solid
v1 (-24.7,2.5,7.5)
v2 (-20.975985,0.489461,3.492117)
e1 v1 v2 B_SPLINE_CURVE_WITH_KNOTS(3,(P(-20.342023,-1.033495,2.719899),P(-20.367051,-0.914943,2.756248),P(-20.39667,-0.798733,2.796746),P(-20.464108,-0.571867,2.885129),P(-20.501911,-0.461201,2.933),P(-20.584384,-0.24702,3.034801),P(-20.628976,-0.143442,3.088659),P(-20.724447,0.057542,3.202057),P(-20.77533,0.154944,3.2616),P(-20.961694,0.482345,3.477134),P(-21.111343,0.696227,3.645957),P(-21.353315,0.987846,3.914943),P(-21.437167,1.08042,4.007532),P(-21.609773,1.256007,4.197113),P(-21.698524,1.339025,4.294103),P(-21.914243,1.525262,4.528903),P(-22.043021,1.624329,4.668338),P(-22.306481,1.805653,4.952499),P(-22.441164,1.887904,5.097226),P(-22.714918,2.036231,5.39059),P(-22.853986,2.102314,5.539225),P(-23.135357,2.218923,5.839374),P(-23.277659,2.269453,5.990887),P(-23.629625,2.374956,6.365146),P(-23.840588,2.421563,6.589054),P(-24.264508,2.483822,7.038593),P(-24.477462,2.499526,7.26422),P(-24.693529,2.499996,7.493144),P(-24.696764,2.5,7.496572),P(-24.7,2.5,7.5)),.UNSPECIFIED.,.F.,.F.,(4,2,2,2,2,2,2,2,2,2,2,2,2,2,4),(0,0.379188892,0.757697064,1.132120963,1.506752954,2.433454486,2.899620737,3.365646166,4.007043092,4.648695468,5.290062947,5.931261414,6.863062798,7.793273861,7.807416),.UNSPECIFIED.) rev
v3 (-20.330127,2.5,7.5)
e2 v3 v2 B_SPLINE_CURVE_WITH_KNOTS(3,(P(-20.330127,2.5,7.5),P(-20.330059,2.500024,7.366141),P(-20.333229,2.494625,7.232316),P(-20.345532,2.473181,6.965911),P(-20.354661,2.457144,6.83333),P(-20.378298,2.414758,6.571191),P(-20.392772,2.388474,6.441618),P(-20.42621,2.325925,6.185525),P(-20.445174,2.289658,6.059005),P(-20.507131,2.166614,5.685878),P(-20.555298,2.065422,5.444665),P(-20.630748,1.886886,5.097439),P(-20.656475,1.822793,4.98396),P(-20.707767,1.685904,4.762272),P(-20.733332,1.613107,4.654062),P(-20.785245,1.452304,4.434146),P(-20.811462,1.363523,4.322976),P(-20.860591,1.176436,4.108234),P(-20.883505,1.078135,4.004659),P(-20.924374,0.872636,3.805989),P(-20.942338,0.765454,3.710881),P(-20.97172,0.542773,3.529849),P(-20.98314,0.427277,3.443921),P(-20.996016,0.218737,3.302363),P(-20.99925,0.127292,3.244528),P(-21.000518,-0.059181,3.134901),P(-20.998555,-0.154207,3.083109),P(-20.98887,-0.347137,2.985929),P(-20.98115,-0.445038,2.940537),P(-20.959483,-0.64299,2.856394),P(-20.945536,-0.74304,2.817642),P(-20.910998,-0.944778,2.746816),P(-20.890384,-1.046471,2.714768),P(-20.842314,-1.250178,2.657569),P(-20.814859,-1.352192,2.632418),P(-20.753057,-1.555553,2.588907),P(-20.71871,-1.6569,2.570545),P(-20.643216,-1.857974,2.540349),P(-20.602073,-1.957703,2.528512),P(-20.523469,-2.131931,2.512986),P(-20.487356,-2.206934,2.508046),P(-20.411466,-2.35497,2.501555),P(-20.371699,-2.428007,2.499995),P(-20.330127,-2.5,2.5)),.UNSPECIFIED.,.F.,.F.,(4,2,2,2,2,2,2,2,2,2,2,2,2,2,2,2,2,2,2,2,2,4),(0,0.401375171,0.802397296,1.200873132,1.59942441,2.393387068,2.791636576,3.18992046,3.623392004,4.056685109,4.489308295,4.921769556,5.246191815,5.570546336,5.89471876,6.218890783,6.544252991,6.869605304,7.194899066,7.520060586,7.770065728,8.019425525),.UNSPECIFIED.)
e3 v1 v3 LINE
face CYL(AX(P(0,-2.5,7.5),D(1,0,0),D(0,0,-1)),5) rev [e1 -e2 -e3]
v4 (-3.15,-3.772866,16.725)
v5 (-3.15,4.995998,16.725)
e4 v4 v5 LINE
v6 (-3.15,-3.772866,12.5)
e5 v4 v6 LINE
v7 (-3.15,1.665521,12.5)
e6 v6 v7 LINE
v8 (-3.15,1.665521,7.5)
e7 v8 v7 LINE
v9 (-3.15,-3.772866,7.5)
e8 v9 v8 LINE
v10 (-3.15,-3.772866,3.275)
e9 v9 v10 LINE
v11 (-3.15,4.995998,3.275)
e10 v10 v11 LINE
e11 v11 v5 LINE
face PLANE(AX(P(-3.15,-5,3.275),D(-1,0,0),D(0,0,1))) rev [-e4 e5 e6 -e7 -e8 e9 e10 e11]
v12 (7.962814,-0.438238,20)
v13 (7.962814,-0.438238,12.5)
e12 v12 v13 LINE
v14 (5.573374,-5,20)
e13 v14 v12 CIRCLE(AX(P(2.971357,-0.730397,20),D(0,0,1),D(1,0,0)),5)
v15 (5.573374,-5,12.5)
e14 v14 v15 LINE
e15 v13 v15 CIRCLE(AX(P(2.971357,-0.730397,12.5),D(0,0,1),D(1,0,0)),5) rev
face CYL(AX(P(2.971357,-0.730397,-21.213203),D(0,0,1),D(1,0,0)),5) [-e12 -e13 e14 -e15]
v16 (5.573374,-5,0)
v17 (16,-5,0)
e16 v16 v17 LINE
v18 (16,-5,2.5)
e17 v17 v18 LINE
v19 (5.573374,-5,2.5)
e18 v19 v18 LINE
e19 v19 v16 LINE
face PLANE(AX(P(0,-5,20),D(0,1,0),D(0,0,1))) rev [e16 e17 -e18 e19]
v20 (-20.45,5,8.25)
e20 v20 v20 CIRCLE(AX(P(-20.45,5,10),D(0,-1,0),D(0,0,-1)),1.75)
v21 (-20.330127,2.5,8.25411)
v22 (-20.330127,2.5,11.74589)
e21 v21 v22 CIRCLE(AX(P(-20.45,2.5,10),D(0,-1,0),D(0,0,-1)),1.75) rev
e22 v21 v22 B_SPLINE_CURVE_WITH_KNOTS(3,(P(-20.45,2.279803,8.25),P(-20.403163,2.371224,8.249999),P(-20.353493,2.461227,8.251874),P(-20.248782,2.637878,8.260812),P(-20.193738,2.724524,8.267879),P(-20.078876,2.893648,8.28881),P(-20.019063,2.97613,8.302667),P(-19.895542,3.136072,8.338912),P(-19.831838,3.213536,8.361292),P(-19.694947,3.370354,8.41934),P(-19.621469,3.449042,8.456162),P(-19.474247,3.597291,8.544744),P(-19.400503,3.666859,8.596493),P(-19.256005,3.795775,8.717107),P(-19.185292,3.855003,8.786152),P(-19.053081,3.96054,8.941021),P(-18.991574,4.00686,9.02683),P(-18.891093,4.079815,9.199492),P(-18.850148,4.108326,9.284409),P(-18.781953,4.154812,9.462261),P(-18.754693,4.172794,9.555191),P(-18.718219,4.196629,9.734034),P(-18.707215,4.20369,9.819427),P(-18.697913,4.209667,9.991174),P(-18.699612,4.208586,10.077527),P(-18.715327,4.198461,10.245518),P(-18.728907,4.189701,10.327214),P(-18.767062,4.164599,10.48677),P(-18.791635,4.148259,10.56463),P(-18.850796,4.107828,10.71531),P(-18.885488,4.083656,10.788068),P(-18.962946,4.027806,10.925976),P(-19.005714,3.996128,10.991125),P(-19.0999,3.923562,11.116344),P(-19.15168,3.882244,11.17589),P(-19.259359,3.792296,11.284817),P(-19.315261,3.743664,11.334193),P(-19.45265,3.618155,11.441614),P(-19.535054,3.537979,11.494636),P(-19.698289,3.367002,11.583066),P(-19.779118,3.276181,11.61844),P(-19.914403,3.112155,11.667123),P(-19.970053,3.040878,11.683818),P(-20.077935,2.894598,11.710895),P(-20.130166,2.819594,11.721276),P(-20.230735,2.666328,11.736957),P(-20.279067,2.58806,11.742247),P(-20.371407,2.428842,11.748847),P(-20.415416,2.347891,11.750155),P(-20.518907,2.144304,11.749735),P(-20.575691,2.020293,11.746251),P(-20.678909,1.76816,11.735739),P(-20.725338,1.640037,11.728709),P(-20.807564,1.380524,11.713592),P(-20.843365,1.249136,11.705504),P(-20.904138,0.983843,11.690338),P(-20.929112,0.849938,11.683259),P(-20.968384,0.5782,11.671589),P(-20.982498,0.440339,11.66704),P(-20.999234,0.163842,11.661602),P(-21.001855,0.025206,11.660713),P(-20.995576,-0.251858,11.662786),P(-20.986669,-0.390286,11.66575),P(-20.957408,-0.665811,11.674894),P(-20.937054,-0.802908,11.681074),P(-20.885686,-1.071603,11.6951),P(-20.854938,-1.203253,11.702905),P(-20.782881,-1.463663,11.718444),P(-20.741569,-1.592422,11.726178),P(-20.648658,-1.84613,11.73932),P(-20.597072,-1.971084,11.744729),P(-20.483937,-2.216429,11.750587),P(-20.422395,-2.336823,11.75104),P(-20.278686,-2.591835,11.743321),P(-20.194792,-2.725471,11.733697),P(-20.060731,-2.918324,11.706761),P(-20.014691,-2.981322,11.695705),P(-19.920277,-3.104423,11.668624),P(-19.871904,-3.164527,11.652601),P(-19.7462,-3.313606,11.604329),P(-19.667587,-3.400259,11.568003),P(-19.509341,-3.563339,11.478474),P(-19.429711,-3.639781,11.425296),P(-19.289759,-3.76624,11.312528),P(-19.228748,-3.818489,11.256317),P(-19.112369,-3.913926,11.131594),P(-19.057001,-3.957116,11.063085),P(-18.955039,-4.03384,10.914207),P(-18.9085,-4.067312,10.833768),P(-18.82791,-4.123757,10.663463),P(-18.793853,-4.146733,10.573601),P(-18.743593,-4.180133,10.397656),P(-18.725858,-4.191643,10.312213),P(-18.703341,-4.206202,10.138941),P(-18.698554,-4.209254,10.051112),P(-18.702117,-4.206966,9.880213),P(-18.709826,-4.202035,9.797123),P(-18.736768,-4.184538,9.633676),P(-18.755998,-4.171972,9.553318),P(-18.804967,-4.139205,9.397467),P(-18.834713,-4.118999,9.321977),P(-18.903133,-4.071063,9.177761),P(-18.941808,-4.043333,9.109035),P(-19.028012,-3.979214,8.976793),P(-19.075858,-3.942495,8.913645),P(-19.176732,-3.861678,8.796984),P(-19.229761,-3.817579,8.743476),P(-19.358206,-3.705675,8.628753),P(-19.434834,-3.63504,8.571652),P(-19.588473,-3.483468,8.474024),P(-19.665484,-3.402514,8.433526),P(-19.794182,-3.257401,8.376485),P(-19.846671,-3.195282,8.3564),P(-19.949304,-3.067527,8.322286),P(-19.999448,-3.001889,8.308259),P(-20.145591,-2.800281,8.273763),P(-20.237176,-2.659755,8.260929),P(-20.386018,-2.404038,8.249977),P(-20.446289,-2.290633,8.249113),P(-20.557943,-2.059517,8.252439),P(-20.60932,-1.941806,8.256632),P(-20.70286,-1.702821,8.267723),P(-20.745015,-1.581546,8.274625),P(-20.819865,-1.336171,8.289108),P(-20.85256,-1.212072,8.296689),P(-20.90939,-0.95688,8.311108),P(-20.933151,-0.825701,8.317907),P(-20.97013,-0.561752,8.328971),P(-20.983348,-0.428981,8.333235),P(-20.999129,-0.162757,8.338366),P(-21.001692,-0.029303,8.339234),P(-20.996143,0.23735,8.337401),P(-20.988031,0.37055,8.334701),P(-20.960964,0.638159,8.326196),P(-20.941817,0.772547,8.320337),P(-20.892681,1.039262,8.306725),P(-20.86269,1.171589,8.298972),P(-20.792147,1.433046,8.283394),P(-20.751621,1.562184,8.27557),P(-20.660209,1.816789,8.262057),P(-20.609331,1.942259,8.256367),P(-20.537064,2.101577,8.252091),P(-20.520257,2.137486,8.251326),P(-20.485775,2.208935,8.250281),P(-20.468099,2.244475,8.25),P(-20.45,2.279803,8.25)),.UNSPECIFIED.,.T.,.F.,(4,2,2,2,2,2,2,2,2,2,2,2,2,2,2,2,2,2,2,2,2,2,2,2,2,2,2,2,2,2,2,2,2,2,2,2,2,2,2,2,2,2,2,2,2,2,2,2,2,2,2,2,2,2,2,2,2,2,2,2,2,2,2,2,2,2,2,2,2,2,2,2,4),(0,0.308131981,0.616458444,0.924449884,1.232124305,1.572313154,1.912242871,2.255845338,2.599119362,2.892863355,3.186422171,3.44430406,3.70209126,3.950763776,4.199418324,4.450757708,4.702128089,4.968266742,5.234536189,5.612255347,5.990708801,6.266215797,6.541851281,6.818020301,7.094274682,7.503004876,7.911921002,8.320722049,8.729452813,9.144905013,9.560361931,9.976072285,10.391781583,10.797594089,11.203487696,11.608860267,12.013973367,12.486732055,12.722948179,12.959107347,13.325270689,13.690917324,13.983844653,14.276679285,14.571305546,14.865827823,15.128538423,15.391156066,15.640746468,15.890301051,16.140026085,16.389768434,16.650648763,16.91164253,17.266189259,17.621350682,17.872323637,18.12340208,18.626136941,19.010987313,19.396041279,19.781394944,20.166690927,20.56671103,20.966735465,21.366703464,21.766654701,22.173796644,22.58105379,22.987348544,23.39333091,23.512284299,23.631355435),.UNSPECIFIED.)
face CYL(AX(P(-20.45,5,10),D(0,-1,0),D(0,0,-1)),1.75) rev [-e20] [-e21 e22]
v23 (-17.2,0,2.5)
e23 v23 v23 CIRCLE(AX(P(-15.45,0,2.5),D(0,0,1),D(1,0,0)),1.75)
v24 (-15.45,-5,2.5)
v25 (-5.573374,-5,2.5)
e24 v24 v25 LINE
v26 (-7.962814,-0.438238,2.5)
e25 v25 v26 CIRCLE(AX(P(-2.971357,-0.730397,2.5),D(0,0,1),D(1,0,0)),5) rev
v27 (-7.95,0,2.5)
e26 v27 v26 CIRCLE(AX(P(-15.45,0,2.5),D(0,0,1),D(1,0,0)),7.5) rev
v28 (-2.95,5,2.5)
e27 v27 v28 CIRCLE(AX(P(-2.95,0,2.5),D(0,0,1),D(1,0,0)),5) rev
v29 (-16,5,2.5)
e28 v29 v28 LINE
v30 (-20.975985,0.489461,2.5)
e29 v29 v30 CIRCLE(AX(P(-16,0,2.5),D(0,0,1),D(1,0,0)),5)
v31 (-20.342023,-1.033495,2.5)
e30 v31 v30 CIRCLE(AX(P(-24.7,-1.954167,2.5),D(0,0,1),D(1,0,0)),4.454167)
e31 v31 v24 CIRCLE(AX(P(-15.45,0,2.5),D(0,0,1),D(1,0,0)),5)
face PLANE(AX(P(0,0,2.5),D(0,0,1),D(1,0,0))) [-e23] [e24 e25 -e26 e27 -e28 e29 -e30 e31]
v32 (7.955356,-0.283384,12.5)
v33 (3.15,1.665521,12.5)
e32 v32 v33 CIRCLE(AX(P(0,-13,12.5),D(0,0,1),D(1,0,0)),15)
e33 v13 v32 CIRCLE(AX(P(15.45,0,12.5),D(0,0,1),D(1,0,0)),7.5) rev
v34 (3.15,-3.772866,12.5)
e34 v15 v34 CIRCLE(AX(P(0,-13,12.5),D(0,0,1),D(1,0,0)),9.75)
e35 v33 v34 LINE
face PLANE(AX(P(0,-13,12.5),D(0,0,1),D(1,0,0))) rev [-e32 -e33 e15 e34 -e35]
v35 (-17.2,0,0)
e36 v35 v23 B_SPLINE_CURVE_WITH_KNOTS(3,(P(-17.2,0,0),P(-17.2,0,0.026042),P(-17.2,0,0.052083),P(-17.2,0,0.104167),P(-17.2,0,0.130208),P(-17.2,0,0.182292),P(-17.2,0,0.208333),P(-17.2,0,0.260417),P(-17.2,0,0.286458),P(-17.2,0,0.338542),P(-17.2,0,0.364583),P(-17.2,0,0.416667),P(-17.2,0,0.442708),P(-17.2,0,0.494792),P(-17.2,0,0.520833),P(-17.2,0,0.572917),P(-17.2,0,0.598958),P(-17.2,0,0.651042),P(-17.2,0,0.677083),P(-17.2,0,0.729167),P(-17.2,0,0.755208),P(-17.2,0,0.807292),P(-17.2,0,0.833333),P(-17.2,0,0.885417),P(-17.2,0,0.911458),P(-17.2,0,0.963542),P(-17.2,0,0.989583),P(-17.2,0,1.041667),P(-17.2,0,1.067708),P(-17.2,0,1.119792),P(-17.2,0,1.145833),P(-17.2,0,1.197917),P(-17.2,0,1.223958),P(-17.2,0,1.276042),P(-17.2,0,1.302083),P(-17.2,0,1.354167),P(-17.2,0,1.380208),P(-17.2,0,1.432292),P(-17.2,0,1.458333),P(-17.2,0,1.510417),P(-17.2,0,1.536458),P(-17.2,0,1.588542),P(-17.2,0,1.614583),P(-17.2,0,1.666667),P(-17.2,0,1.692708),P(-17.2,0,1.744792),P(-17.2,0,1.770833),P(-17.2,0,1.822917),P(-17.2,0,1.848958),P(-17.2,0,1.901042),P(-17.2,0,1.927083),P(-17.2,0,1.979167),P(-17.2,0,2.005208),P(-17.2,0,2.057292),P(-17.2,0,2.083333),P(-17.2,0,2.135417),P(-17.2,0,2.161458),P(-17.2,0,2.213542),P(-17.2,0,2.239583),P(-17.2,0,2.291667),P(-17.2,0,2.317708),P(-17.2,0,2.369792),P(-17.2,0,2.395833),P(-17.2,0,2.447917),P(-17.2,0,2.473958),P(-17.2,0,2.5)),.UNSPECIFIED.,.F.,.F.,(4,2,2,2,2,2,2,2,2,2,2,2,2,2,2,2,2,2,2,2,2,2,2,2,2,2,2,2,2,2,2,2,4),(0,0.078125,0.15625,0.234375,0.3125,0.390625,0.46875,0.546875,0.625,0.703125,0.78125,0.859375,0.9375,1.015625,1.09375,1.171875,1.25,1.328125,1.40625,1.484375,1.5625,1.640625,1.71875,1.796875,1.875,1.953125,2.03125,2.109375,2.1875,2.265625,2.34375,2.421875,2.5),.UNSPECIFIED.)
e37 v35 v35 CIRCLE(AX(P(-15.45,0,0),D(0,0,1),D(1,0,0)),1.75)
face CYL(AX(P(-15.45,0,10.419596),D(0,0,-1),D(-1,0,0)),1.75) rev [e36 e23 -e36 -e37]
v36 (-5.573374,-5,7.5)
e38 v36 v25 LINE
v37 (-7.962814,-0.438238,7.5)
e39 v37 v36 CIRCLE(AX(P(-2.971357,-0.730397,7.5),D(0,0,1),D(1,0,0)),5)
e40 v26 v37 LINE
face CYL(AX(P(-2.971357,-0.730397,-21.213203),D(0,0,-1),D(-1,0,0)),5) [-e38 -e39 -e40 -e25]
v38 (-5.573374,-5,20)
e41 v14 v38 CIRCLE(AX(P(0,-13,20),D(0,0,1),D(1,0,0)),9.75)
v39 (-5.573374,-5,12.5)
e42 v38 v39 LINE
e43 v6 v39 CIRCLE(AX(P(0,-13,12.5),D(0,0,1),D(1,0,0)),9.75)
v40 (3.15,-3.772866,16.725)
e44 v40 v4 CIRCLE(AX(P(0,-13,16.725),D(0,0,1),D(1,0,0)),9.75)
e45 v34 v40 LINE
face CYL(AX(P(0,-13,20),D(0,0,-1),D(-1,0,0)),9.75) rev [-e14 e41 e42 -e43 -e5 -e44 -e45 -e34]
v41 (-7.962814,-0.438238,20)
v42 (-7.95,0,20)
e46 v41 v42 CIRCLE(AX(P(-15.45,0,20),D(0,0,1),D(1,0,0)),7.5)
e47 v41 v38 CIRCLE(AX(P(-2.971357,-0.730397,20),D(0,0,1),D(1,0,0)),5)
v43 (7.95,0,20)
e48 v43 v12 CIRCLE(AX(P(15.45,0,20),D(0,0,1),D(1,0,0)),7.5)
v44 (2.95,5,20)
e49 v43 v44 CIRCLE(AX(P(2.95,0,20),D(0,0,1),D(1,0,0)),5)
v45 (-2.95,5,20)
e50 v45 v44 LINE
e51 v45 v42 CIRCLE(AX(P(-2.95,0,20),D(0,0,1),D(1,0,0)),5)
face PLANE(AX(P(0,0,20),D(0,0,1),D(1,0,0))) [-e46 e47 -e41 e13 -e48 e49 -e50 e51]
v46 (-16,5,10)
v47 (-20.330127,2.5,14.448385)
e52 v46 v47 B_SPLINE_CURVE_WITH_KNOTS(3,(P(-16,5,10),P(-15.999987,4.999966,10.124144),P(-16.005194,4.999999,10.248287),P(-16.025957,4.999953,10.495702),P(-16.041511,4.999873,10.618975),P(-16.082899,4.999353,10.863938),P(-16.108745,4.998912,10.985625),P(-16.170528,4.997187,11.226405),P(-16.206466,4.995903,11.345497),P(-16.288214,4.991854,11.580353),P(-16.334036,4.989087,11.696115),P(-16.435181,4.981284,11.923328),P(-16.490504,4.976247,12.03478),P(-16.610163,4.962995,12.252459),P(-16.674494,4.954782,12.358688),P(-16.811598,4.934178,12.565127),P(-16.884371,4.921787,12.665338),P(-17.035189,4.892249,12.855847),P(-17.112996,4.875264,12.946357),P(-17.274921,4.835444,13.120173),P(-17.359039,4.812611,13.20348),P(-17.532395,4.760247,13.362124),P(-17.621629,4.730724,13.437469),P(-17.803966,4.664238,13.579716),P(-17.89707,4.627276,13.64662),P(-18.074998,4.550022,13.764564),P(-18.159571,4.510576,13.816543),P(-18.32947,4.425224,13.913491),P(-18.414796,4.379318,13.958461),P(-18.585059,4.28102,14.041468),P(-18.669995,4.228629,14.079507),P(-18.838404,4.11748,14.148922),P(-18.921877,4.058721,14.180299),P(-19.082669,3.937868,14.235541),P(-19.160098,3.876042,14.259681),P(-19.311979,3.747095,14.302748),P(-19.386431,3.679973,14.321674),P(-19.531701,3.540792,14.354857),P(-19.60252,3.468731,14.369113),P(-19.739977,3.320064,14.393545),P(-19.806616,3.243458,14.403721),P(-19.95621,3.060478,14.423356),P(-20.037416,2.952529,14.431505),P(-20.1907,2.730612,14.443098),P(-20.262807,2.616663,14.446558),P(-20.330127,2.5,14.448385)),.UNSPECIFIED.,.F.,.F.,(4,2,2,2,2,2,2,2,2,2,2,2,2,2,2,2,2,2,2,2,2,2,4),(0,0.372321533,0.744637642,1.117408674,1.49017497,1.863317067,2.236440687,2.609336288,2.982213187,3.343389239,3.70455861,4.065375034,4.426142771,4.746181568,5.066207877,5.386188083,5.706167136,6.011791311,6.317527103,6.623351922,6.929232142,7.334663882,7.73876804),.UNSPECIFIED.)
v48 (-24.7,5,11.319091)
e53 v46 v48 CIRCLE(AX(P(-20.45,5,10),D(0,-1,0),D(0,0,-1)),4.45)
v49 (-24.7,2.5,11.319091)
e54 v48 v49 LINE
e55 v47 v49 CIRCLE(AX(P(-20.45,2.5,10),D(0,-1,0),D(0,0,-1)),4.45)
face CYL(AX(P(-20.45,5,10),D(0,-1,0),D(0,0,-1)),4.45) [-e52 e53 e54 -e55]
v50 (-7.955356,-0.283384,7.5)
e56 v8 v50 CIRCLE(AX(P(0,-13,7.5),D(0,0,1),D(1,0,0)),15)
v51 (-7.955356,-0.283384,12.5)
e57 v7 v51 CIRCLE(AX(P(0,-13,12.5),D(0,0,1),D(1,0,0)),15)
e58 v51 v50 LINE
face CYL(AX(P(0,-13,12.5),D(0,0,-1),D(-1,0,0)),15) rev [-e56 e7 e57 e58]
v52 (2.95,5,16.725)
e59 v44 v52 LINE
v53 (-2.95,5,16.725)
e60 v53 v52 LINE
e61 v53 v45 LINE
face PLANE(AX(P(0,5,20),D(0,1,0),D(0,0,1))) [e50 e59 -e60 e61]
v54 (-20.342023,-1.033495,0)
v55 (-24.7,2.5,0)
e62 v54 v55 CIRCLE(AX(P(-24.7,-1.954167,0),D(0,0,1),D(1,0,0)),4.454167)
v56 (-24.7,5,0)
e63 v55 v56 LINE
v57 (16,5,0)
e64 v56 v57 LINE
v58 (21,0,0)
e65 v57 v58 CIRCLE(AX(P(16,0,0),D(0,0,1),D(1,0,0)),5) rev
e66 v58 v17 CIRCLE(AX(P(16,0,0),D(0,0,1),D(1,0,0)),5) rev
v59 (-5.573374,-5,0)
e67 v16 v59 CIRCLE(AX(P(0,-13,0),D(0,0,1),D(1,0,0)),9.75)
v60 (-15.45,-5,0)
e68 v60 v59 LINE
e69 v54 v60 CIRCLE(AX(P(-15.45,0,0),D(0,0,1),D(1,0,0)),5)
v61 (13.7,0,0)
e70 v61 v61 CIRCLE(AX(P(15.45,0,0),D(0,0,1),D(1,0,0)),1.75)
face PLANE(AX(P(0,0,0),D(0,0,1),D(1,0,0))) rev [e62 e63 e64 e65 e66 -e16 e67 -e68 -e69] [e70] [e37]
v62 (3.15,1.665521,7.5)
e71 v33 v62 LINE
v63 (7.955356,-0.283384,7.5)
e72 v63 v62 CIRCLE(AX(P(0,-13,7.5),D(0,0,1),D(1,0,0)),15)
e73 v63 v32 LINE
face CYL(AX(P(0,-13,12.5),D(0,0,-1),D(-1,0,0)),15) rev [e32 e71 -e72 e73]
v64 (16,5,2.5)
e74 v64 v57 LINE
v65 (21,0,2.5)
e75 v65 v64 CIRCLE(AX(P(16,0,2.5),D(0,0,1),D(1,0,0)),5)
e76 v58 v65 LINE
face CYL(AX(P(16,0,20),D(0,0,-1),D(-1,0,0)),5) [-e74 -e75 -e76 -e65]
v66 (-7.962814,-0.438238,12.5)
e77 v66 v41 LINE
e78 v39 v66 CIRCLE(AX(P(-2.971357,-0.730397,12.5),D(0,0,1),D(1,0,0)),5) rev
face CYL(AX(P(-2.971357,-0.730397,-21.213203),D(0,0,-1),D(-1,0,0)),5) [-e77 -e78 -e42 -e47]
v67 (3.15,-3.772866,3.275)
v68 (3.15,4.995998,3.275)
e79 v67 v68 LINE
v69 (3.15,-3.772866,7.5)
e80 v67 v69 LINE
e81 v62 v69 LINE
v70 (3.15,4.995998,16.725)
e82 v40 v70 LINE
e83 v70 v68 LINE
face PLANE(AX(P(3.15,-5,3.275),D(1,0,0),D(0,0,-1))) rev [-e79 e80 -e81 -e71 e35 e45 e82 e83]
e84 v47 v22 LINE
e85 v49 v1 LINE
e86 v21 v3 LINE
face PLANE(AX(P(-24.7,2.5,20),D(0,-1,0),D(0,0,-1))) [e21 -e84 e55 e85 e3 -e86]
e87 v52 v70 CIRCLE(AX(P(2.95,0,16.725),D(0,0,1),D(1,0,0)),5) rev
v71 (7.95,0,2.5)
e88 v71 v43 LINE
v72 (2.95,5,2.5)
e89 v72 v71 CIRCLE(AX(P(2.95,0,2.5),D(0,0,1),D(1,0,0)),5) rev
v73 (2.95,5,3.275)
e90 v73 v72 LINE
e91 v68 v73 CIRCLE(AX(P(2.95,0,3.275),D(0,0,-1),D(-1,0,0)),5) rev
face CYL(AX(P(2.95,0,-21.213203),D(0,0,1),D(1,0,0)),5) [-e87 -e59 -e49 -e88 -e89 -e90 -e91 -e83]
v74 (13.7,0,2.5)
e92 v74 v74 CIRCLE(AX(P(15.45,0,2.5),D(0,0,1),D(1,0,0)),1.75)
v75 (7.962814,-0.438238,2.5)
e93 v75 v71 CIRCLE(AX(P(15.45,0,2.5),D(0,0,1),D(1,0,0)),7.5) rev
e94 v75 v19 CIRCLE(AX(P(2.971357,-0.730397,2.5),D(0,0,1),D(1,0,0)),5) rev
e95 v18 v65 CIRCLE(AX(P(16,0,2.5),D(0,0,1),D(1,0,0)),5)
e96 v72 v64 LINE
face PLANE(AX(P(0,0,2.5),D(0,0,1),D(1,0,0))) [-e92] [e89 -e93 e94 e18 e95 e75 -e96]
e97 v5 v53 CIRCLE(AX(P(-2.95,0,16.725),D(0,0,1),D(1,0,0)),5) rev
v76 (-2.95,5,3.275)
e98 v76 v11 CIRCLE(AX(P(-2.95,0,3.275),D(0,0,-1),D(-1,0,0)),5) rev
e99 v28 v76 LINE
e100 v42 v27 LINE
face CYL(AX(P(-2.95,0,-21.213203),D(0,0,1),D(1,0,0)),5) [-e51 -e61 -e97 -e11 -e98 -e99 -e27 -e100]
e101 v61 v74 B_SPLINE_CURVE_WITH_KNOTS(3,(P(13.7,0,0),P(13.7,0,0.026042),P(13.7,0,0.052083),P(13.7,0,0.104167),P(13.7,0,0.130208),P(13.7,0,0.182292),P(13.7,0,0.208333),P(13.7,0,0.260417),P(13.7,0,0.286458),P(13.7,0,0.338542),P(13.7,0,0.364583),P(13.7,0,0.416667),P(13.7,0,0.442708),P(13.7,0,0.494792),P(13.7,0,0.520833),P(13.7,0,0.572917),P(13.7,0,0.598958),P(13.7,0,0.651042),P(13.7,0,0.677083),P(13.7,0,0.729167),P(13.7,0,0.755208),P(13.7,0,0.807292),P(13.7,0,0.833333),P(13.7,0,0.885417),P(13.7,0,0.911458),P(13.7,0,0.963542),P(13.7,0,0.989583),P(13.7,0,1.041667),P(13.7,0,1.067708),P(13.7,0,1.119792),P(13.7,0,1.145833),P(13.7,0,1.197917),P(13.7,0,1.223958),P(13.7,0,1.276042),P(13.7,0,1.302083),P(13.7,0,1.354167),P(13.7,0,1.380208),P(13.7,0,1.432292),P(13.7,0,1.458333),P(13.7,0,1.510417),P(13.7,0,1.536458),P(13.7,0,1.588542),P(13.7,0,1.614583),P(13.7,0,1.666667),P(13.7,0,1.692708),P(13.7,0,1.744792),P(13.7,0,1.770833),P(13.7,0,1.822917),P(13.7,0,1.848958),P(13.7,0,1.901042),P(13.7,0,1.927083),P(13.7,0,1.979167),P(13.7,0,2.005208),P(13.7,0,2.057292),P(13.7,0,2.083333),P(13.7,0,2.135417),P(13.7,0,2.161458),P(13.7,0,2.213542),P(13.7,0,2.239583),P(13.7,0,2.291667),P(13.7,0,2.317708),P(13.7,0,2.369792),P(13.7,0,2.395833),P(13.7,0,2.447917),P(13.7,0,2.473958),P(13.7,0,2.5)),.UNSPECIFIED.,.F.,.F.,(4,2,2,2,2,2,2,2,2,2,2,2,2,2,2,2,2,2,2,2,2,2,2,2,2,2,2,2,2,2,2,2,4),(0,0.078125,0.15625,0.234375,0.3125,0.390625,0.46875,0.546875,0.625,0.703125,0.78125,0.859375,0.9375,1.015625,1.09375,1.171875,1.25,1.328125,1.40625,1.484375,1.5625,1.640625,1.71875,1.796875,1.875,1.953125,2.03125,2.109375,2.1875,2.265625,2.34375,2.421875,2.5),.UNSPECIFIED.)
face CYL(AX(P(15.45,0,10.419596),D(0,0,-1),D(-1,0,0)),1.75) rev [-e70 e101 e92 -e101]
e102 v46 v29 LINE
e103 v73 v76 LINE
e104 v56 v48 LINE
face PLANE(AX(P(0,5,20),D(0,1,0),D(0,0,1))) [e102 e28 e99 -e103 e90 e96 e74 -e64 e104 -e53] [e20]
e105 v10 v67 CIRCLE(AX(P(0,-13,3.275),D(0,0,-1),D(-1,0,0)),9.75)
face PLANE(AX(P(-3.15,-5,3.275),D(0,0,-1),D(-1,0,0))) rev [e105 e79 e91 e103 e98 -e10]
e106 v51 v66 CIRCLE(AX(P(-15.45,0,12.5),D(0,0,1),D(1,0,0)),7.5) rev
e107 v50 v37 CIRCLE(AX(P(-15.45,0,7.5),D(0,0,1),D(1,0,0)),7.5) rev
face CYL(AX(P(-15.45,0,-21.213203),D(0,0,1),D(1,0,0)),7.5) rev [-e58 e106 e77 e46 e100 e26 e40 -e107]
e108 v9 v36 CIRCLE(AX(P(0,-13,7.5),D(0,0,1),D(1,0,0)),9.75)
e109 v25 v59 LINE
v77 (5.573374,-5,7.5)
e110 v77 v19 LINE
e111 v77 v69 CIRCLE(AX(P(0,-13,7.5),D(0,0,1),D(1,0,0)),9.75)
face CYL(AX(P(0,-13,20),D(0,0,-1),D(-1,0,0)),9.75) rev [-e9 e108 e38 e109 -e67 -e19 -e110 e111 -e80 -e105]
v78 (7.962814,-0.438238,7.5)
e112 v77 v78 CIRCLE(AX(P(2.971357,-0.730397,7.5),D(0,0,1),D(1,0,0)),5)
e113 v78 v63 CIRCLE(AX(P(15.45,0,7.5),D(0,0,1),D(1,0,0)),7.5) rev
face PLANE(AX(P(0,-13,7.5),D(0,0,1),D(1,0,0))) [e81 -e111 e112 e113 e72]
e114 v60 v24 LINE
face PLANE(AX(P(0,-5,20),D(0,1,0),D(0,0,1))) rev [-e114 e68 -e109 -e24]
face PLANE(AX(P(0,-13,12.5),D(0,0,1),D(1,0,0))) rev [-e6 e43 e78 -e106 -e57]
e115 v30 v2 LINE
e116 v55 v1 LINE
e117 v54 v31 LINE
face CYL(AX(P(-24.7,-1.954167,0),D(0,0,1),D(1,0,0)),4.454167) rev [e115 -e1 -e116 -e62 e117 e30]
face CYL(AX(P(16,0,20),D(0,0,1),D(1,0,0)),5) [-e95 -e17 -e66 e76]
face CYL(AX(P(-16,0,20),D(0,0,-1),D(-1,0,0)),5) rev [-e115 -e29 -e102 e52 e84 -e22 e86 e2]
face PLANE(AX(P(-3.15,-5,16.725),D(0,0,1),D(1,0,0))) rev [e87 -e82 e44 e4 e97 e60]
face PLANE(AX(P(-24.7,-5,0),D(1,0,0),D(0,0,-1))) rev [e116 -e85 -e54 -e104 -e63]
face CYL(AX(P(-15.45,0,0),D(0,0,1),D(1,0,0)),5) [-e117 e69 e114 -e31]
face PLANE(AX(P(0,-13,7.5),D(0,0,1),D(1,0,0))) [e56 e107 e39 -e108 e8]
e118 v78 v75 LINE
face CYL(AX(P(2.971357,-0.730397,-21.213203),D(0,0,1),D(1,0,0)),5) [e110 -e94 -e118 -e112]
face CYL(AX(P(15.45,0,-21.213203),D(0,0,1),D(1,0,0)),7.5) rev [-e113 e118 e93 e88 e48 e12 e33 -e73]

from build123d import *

# Parameters (mm, degrees)
SKETCH2_R               = 2.8000000000000056
BOSS_EXTRUDE1_DEPTH     = 20
CUT_EXTRUDE1_DEPTH      = 31.675723300355934
SKETCH4_R               = 7.499999999999999
CUT_EXTRUDE2_DEPTH      = 17.5
CUT_EXTRUDE3_DEPTH      = 2.5
CUT_EXTRUDE3_DEPTH_BACK = 2.5
SKETCH6_R               = 15
FILLET1_R               = 5
FILLET2_R               = 5
BOSS_EXTRUDE2_DEPTH     = 20
SKETCH8_R               = 1.7500000000000004
CUT_EXTRUDE4_DEPTH      = 39.87211487346831
CUT_EXTRUDE5_DEPTH      = 20
CUT_EXTRUDE6_DEPTH      = 31.68126471480597
CUT_EXTRUDE7_DEPTH      = 33.654861873847
FILLET4_R               = 5
CUT_EXTRUDE9_DEPTH      = 31.681264738273054
CUT_EXTRUDE9_DEPTH_BACK = 31.681264738273054
SKETCH13_R              = 2.8000000000000056
SKETCH13_R_2            = 1.75
SKETCH13_R_3            = 1.7500000000000002
BOSS_EXTRUDE3_DEPTH     = 2.5


# Some blends are built 0.0001 mm under size
with BuildPart() as part:
    # Sketch2 → Boss-Extrude1 (new body)
    with BuildSketch(Plane.XY):
        with BuildLine():
            Line((21, 5), (-21, 5))
            Line((-21, 5), (-21, -5))
            Line((-21, -5), (-5.57337420240183, -5))
            ThreePointArc((-5.5733742024018555, -4.999999999999908), (5.415e-14, -3.25), (5.573374202401943, -4.999999999999966))
            Line((5.573374202401933, -5), (21, -5))
            Line((21, -5), (21, 5))
        make_face()
        with Locations((-15.45, 0)):
            Circle(SKETCH2_R, mode=Mode.SUBTRACT)
        with Locations((15.45, 0)):
            Circle(SKETCH2_R, mode=Mode.SUBTRACT)
    extrude(amount=BOSS_EXTRUDE1_DEPTH)

    # Sketch3 → Cut-Extrude1 (cut, through all)
    with BuildSketch(Plane(origin=(0, 5, 0), x_dir=(1, 0, 0), z_dir=(0, 1, 0))):
        Polygon((-3.1499999999999995, -3.2750000000000004), (3.1500000000000004, -3.275), (3.1499999999999964, -16.725), (-3.1499999999999924, -16.725), align=None)
    extrude(amount=-CUT_EXTRUDE1_DEPTH, mode=Mode.SUBTRACT)

    # Sketch4 → Cut-Extrude2 (cut)
    with BuildSketch(Plane.XY.offset(20)):
        with Locations((-15.45, 0)):
            Circle(SKETCH4_R)
        with Locations((15.45, 0)):
            Circle(SKETCH4_R)
    extrude(amount=-CUT_EXTRUDE2_DEPTH, mode=Mode.SUBTRACT)

    # Sketch6 → Cut-Extrude3 (cut, two sides: drawn at the far end of the back side and taken through both)
    with BuildSketch(Plane.XY.offset(10.000000000000002).offset(-CUT_EXTRUDE3_DEPTH_BACK)):
        with Locations((1.63e-15, -13)):
            Circle(SKETCH6_R)
    extrude(amount=CUT_EXTRUDE3_DEPTH + CUT_EXTRUDE3_DEPTH_BACK, mode=Mode.SUBTRACT)

    # Fillet1
    fillet1_edges = [part.edges().sort_by_distance(p)[0] for p in [
        (21, -5, 1.25),
        (21, 5, 1.25),
        (-21, -5, 1.25),
        (-21, 5, 1.25),
    ]]
    fillet(fillet1_edges, radius=FILLET1_R - 0.0001)  # a hair under: the kernel refuses the full size

    # Fillet2
    # the kernel refuses this fillet: 5 mm, written as the material it takes off along each edge
    with BuildSketch(Plane(origin=(9.859830056250527, -5, 0.14880111239423144), x_dir=(-0.38397397843956865, 0.9233439141951876, 0), z_dir=(0, 0, 1))) as fillet2_piece_1_section:
        with BuildLine():
            CenterArc((6.587306073389745, 4.721012859383849), FILLET2_R, 188.77925307578494, 61.9904903791857)
            Line((1.6458875076078383, 3.957872926117424), (0, 0))
            ThreePointArc((0, 0), (2.470239777521158, 0.41848071092422756), (4.940479555042308, 8e-17))
        make_face()
    fillet2_piece_1 = extrude(amount=32.20239777521154, mode=Mode.PRIVATE)
    fillet2_piece_1 = split(fillet2_piece_1, bisect_by=Plane(origin=(9.859830056250527, -5, 2.5), z_dir=(0, 0, 1)), keep=Keep.TOP, mode=Mode.PRIVATE)
    add(fillet2_piece_1, mode=Mode.SUBTRACT)
    with BuildSketch(Plane(origin=(9.859830056250527, -5, 2.5), x_dir=(-1, 4.35e-15, 0), z_dir=(0, 0, 1))) as fillet2_piece_2:
        with BuildLine():
            CenterArc((6.888472612747909, -4.269602883923407), FILLET2_R, 121.35931142653445, 61.990490379185644)
            ThreePointArc((1.8970155901489643, -4.561761730354054), (1.334909412714444, -2.120195161703234), (0, 0))
            Line((0, 0), (4.286455853848589, 0))
        make_face()
    extrude(amount=17.35119888760577, mode=Mode.SUBTRACT)
    with BuildSketch(Plane(origin=(9.859830056250527, 5, 2.5), x_dir=(-0.3568220897730901, -0.9341723589627157, 0), z_dir=(0, 0, 1))) as fillet2_piece_3:
        with BuildLine():
            CenterArc((7.136441795461798, -4.670861794813579), FILLET2_R, 110.90515744788931, 90.00000000000068)
            Line((2.4655800006482402, -6.454972243679084), (0, 0))
            ThreePointArc((0, 0), (2.6761656732981733, -0.49370730777963273), (5.3523313465963485, -4e-17))
        make_face()
    extrude(amount=34.77457514062646, mode=Mode.SUBTRACT)
    with BuildSketch(Plane(origin=(-9.859830056250527, -5, 2.5), x_dir=(1, 1.077e-14, 0), z_dir=(0, 0, 1))) as fillet2_piece_4:
        with BuildLine():
            CenterArc((6.88847261274794, 4.2696028839234454), FILLET2_R, 176.65019819427988, 61.9904903791865)
            ThreePointArc((1.8970155901489953, 4.561761730354092), (1.3349094127144647, 2.1201951617032417), (0, 0))
            Line((0, 0), (4.286455853848682, 0))
        make_face()
    extrude(amount=17.351198887605886, mode=Mode.SUBTRACT)
    with BuildSketch(Plane(origin=(-9.859830056250527, -5, 0.14880111239411775), x_dir=(0.3839739784395653, 0.9233439141951888, 0), z_dir=(0, 0, 1))) as fillet2_piece_5_section:
        with BuildLine():
            CenterArc((6.587306073389805, -4.721012859383843), FILLET2_R, 109.23025654502955, 61.99049037918651)
            Line((1.645887507607885, -3.957872926117504), (0, 0))
            ThreePointArc((0, 0), (2.4702397775211735, -0.4184807109242367), (4.940479555042354, -1.7e-16))
        make_face()
    fillet2_piece_5 = extrude(amount=32.20239777521177, mode=Mode.PRIVATE)
    fillet2_piece_5 = split(fillet2_piece_5, bisect_by=Plane(origin=(-9.859830056250527, -5, 2.5), z_dir=(0, 0, 1)), keep=Keep.TOP, mode=Mode.PRIVATE)
    add(fillet2_piece_5, mode=Mode.SUBTRACT)
    with BuildSketch(Plane(origin=(-9.859830056250527, 5, 2.5), x_dir=(1, 0, 0), z_dir=(0, 0, 1))) as fillet2_piece_6:
        with BuildLine():
            CenterArc((6.909830056250634, -5), FILLET2_R, 90, 90)
            ThreePointArc((1.9098300562506338, -5.000000000000002), (1.416122748470901, -2.3238343267018453), (0, 0))
            Line((0, 0), (6.909830056250634, 0))
        make_face()
    extrude(amount=34.77457514062658, mode=Mode.SUBTRACT)

    # Sketch7 → Boss-Extrude2 (add)
    with BuildSketch(Plane(origin=(0, 0, 0), x_dir=(-1, 0, 0), z_dir=(0, 0, -1))):
        with BuildLine():
            Line((15.999999999999982, 5.000000000000001), (31.796875864400832, 5))
            Line((31.796875864400832, 5), (31.796875864400825, -4.999999999999998))
            Line((31.796875864400825, -4.999999999999998), (16, -5))
            ThreePointArc((16, -5), (19.53553390593274, -3.5355339059327413), (21, 0))
            ThreePointArc((21, 0), (19.535533905932727, 3.53553390593274), (15.999999999999982, 5.000000000000001))
        make_face()
    extrude(amount=-BOSS_EXTRUDE2_DEPTH)

    # Sketch8 → Cut-Extrude4 (cut, through all)
    with BuildSketch(Plane.XZ.offset(5)):
        with Locations(Location((-20.449999999999953, 10.000000000000002, 0), (0, 0, 270))):
            Circle(SKETCH8_R)
    extrude(amount=-CUT_EXTRUDE4_DEPTH, mode=Mode.SUBTRACT)

    # Sketch9 → Cut-Extrude5 (cut)
    with BuildSketch(Plane.XY.offset(20)):
        Polygon((-31.796875864400832, 5), (-31.796875864400825, -4.999999999999998), (-24.69999999999995, -4.999999999999998), (-24.69999999999995, 5), align=None)
    extrude(amount=-CUT_EXTRUDE5_DEPTH, mode=Mode.SUBTRACT)

    # Sketch10 → Cut-Extrude6 (cut, through all)
    with BuildSketch(Plane.XY.offset(2.5)):
        Polygon((-24.69999999999995, -4.999999999999999), (-15.999999999999948, -4.999999999999999), (-15.999999999999982, 2.5000000000000004), (-24.69999999999995, 2.5000000000000004), align=None)
    extrude(amount=CUT_EXTRUDE6_DEPTH, mode=Mode.SUBTRACT)

    # Sketch11 → Cut-Extrude7 (cut, through all)
    with BuildSketch(Plane.XZ.offset(-2.5000000000000004)):
        with BuildLine():
            Line((-20.330127018922187, 20), (-20.330127018922184, 14.448385152884956))
            ThreePointArc((-20.330127018922198, 14.448385152884956), (-17.261274959658927, 13.103954351645958), (-15.99999999999998, 10.000000000000002))
            Line((-15.999999999999982, 10.000000000000002), (-15.999999999999982, 20))
            Line((-15.999999999999982, 20), (-20.330127018922187, 20))
        make_face()
        with BuildLine():
            Line((-24.69999999999995, 20), (-24.69999999999995, 11.31909059582739))
            ThreePointArc((-24.699999999999896, 11.319090595827381), (-23.040870202135775, 13.61799552178889), (-20.330127018922198, 14.448385152884956))
            Line((-20.330127018922184, 14.448385152884956), (-20.330127018922187, 20))
            Line((-20.330127018922187, 20), (-24.69999999999995, 20))
        make_face()
    extrude(amount=-CUT_EXTRUDE7_DEPTH, mode=Mode.SUBTRACT)

    # Fillet4
    fillet4_edges = [part.edges().sort_by_distance(p)[0] for p in [
        (-22.51506350946113, 2.5000000000000004, 2.5),
    ]]
    fillet(fillet4_edges, radius=FILLET4_R)

    # Sketch12 → Cut-Extrude9 (cut, two sides: drawn at the far end of the back side and taken through both)
    with BuildSketch(Plane.XY.offset(2.5).offset(-CUT_EXTRUDE9_DEPTH_BACK)):
        with BuildLine():
            Line((-24.69999999999995, -4.999999999999999), (-21.45000000000008, -4.999999999999999))
            ThreePointArc((-21.45000000000008, -5), (-20.557799958891973, -3.5917806364070426), (-20.245833333333337, -1.9541666666666095))
            ThreePointArc((-20.245833333333337, -1.9541666666666084), (-20.269945987618247, -1.4913252879797767), (-20.34202288251563, -1.0334950976871942))
            ThreePointArc((-20.34202288251563, -1.0334950976871942), (-20.587884121097368, -0.2424121010465221), (-20.975985161662212, 0.4894605917924846))
            ThreePointArc((-20.975985161662173, 0.4894605917924937), (-20.887243562262398, -1.0558647466057054), (-20.330127018922195, -2.499999999999999))
            Line((-20.330127018922195, -2.4999999999999996), (-24.69999999999995, -2.4999999999999996))
            Line((-24.69999999999995, -2.4999999999999996), (-24.69999999999995, -4.999999999999999))
        make_face()
        with BuildLine():
            ThreePointArc((-20.975985161662212, 0.4894605917924846), (-29.137653111561168, -1.570975388197232), (-21.45000000000008, -5))
            Line((-21.45000000000008, -4.999999999999999), (-24.69999999999995, -4.999999999999999))
            Line((-24.69999999999995, -4.999999999999999), (-24.69999999999995, -2.4999999999999996))
            Line((-24.69999999999995, -2.4999999999999996), (-20.330127018922195, -2.4999999999999996))
            ThreePointArc((-20.330127018922195, -2.499999999999999), (-20.887243562262398, -1.0558647466057054), (-20.975985161662173, 0.4894605917924937))
        make_face()
        with BuildLine():
            Line((-21.45000000000008, -4.999999999999999), (-15.45, -5))
            ThreePointArc((-15.450000000000001, -5), (-18.59900972621267, -3.8837787970246174), (-20.34202288251563, -1.0334950976871942))
            ThreePointArc((-20.34202288251563, -1.0334950976871942), (-20.269945987618247, -1.4913252879797767), (-20.245833333333337, -1.9541666666666084))
            ThreePointArc((-20.245833333333337, -1.9541666666666095), (-20.557799958891973, -3.5917806364070426), (-21.45000000000008, -5))
        make_face()
    extrude(amount=CUT_EXTRUDE9_DEPTH + CUT_EXTRUDE9_DEPTH_BACK, mode=Mode.SUBTRACT)

    # Sketch13 → Boss-Extrude3 (add)
    # profile 1 of 2: a face of its own
    with BuildSketch(Plane.XY):
        with Locations((-15.45, 0)):
            Circle(SKETCH13_R)
        with Locations(Location((-15.45, 0, 0), (0, 0, 180))):
            Circle(SKETCH13_R_2, mode=Mode.SUBTRACT)
    # profile 2 of 2: a face of its own
    with BuildSketch(Plane.XY):
        with Locations((15.45, 0)):
            Circle(SKETCH13_R)
        with Locations(Location((15.45, 0, 0), (0, 0, 180))):
            Circle(SKETCH13_R_3, mode=Mode.SUBTRACT)
    extrude(amount=BOSS_EXTRUDE3_DEPTH)


solid = part.part
